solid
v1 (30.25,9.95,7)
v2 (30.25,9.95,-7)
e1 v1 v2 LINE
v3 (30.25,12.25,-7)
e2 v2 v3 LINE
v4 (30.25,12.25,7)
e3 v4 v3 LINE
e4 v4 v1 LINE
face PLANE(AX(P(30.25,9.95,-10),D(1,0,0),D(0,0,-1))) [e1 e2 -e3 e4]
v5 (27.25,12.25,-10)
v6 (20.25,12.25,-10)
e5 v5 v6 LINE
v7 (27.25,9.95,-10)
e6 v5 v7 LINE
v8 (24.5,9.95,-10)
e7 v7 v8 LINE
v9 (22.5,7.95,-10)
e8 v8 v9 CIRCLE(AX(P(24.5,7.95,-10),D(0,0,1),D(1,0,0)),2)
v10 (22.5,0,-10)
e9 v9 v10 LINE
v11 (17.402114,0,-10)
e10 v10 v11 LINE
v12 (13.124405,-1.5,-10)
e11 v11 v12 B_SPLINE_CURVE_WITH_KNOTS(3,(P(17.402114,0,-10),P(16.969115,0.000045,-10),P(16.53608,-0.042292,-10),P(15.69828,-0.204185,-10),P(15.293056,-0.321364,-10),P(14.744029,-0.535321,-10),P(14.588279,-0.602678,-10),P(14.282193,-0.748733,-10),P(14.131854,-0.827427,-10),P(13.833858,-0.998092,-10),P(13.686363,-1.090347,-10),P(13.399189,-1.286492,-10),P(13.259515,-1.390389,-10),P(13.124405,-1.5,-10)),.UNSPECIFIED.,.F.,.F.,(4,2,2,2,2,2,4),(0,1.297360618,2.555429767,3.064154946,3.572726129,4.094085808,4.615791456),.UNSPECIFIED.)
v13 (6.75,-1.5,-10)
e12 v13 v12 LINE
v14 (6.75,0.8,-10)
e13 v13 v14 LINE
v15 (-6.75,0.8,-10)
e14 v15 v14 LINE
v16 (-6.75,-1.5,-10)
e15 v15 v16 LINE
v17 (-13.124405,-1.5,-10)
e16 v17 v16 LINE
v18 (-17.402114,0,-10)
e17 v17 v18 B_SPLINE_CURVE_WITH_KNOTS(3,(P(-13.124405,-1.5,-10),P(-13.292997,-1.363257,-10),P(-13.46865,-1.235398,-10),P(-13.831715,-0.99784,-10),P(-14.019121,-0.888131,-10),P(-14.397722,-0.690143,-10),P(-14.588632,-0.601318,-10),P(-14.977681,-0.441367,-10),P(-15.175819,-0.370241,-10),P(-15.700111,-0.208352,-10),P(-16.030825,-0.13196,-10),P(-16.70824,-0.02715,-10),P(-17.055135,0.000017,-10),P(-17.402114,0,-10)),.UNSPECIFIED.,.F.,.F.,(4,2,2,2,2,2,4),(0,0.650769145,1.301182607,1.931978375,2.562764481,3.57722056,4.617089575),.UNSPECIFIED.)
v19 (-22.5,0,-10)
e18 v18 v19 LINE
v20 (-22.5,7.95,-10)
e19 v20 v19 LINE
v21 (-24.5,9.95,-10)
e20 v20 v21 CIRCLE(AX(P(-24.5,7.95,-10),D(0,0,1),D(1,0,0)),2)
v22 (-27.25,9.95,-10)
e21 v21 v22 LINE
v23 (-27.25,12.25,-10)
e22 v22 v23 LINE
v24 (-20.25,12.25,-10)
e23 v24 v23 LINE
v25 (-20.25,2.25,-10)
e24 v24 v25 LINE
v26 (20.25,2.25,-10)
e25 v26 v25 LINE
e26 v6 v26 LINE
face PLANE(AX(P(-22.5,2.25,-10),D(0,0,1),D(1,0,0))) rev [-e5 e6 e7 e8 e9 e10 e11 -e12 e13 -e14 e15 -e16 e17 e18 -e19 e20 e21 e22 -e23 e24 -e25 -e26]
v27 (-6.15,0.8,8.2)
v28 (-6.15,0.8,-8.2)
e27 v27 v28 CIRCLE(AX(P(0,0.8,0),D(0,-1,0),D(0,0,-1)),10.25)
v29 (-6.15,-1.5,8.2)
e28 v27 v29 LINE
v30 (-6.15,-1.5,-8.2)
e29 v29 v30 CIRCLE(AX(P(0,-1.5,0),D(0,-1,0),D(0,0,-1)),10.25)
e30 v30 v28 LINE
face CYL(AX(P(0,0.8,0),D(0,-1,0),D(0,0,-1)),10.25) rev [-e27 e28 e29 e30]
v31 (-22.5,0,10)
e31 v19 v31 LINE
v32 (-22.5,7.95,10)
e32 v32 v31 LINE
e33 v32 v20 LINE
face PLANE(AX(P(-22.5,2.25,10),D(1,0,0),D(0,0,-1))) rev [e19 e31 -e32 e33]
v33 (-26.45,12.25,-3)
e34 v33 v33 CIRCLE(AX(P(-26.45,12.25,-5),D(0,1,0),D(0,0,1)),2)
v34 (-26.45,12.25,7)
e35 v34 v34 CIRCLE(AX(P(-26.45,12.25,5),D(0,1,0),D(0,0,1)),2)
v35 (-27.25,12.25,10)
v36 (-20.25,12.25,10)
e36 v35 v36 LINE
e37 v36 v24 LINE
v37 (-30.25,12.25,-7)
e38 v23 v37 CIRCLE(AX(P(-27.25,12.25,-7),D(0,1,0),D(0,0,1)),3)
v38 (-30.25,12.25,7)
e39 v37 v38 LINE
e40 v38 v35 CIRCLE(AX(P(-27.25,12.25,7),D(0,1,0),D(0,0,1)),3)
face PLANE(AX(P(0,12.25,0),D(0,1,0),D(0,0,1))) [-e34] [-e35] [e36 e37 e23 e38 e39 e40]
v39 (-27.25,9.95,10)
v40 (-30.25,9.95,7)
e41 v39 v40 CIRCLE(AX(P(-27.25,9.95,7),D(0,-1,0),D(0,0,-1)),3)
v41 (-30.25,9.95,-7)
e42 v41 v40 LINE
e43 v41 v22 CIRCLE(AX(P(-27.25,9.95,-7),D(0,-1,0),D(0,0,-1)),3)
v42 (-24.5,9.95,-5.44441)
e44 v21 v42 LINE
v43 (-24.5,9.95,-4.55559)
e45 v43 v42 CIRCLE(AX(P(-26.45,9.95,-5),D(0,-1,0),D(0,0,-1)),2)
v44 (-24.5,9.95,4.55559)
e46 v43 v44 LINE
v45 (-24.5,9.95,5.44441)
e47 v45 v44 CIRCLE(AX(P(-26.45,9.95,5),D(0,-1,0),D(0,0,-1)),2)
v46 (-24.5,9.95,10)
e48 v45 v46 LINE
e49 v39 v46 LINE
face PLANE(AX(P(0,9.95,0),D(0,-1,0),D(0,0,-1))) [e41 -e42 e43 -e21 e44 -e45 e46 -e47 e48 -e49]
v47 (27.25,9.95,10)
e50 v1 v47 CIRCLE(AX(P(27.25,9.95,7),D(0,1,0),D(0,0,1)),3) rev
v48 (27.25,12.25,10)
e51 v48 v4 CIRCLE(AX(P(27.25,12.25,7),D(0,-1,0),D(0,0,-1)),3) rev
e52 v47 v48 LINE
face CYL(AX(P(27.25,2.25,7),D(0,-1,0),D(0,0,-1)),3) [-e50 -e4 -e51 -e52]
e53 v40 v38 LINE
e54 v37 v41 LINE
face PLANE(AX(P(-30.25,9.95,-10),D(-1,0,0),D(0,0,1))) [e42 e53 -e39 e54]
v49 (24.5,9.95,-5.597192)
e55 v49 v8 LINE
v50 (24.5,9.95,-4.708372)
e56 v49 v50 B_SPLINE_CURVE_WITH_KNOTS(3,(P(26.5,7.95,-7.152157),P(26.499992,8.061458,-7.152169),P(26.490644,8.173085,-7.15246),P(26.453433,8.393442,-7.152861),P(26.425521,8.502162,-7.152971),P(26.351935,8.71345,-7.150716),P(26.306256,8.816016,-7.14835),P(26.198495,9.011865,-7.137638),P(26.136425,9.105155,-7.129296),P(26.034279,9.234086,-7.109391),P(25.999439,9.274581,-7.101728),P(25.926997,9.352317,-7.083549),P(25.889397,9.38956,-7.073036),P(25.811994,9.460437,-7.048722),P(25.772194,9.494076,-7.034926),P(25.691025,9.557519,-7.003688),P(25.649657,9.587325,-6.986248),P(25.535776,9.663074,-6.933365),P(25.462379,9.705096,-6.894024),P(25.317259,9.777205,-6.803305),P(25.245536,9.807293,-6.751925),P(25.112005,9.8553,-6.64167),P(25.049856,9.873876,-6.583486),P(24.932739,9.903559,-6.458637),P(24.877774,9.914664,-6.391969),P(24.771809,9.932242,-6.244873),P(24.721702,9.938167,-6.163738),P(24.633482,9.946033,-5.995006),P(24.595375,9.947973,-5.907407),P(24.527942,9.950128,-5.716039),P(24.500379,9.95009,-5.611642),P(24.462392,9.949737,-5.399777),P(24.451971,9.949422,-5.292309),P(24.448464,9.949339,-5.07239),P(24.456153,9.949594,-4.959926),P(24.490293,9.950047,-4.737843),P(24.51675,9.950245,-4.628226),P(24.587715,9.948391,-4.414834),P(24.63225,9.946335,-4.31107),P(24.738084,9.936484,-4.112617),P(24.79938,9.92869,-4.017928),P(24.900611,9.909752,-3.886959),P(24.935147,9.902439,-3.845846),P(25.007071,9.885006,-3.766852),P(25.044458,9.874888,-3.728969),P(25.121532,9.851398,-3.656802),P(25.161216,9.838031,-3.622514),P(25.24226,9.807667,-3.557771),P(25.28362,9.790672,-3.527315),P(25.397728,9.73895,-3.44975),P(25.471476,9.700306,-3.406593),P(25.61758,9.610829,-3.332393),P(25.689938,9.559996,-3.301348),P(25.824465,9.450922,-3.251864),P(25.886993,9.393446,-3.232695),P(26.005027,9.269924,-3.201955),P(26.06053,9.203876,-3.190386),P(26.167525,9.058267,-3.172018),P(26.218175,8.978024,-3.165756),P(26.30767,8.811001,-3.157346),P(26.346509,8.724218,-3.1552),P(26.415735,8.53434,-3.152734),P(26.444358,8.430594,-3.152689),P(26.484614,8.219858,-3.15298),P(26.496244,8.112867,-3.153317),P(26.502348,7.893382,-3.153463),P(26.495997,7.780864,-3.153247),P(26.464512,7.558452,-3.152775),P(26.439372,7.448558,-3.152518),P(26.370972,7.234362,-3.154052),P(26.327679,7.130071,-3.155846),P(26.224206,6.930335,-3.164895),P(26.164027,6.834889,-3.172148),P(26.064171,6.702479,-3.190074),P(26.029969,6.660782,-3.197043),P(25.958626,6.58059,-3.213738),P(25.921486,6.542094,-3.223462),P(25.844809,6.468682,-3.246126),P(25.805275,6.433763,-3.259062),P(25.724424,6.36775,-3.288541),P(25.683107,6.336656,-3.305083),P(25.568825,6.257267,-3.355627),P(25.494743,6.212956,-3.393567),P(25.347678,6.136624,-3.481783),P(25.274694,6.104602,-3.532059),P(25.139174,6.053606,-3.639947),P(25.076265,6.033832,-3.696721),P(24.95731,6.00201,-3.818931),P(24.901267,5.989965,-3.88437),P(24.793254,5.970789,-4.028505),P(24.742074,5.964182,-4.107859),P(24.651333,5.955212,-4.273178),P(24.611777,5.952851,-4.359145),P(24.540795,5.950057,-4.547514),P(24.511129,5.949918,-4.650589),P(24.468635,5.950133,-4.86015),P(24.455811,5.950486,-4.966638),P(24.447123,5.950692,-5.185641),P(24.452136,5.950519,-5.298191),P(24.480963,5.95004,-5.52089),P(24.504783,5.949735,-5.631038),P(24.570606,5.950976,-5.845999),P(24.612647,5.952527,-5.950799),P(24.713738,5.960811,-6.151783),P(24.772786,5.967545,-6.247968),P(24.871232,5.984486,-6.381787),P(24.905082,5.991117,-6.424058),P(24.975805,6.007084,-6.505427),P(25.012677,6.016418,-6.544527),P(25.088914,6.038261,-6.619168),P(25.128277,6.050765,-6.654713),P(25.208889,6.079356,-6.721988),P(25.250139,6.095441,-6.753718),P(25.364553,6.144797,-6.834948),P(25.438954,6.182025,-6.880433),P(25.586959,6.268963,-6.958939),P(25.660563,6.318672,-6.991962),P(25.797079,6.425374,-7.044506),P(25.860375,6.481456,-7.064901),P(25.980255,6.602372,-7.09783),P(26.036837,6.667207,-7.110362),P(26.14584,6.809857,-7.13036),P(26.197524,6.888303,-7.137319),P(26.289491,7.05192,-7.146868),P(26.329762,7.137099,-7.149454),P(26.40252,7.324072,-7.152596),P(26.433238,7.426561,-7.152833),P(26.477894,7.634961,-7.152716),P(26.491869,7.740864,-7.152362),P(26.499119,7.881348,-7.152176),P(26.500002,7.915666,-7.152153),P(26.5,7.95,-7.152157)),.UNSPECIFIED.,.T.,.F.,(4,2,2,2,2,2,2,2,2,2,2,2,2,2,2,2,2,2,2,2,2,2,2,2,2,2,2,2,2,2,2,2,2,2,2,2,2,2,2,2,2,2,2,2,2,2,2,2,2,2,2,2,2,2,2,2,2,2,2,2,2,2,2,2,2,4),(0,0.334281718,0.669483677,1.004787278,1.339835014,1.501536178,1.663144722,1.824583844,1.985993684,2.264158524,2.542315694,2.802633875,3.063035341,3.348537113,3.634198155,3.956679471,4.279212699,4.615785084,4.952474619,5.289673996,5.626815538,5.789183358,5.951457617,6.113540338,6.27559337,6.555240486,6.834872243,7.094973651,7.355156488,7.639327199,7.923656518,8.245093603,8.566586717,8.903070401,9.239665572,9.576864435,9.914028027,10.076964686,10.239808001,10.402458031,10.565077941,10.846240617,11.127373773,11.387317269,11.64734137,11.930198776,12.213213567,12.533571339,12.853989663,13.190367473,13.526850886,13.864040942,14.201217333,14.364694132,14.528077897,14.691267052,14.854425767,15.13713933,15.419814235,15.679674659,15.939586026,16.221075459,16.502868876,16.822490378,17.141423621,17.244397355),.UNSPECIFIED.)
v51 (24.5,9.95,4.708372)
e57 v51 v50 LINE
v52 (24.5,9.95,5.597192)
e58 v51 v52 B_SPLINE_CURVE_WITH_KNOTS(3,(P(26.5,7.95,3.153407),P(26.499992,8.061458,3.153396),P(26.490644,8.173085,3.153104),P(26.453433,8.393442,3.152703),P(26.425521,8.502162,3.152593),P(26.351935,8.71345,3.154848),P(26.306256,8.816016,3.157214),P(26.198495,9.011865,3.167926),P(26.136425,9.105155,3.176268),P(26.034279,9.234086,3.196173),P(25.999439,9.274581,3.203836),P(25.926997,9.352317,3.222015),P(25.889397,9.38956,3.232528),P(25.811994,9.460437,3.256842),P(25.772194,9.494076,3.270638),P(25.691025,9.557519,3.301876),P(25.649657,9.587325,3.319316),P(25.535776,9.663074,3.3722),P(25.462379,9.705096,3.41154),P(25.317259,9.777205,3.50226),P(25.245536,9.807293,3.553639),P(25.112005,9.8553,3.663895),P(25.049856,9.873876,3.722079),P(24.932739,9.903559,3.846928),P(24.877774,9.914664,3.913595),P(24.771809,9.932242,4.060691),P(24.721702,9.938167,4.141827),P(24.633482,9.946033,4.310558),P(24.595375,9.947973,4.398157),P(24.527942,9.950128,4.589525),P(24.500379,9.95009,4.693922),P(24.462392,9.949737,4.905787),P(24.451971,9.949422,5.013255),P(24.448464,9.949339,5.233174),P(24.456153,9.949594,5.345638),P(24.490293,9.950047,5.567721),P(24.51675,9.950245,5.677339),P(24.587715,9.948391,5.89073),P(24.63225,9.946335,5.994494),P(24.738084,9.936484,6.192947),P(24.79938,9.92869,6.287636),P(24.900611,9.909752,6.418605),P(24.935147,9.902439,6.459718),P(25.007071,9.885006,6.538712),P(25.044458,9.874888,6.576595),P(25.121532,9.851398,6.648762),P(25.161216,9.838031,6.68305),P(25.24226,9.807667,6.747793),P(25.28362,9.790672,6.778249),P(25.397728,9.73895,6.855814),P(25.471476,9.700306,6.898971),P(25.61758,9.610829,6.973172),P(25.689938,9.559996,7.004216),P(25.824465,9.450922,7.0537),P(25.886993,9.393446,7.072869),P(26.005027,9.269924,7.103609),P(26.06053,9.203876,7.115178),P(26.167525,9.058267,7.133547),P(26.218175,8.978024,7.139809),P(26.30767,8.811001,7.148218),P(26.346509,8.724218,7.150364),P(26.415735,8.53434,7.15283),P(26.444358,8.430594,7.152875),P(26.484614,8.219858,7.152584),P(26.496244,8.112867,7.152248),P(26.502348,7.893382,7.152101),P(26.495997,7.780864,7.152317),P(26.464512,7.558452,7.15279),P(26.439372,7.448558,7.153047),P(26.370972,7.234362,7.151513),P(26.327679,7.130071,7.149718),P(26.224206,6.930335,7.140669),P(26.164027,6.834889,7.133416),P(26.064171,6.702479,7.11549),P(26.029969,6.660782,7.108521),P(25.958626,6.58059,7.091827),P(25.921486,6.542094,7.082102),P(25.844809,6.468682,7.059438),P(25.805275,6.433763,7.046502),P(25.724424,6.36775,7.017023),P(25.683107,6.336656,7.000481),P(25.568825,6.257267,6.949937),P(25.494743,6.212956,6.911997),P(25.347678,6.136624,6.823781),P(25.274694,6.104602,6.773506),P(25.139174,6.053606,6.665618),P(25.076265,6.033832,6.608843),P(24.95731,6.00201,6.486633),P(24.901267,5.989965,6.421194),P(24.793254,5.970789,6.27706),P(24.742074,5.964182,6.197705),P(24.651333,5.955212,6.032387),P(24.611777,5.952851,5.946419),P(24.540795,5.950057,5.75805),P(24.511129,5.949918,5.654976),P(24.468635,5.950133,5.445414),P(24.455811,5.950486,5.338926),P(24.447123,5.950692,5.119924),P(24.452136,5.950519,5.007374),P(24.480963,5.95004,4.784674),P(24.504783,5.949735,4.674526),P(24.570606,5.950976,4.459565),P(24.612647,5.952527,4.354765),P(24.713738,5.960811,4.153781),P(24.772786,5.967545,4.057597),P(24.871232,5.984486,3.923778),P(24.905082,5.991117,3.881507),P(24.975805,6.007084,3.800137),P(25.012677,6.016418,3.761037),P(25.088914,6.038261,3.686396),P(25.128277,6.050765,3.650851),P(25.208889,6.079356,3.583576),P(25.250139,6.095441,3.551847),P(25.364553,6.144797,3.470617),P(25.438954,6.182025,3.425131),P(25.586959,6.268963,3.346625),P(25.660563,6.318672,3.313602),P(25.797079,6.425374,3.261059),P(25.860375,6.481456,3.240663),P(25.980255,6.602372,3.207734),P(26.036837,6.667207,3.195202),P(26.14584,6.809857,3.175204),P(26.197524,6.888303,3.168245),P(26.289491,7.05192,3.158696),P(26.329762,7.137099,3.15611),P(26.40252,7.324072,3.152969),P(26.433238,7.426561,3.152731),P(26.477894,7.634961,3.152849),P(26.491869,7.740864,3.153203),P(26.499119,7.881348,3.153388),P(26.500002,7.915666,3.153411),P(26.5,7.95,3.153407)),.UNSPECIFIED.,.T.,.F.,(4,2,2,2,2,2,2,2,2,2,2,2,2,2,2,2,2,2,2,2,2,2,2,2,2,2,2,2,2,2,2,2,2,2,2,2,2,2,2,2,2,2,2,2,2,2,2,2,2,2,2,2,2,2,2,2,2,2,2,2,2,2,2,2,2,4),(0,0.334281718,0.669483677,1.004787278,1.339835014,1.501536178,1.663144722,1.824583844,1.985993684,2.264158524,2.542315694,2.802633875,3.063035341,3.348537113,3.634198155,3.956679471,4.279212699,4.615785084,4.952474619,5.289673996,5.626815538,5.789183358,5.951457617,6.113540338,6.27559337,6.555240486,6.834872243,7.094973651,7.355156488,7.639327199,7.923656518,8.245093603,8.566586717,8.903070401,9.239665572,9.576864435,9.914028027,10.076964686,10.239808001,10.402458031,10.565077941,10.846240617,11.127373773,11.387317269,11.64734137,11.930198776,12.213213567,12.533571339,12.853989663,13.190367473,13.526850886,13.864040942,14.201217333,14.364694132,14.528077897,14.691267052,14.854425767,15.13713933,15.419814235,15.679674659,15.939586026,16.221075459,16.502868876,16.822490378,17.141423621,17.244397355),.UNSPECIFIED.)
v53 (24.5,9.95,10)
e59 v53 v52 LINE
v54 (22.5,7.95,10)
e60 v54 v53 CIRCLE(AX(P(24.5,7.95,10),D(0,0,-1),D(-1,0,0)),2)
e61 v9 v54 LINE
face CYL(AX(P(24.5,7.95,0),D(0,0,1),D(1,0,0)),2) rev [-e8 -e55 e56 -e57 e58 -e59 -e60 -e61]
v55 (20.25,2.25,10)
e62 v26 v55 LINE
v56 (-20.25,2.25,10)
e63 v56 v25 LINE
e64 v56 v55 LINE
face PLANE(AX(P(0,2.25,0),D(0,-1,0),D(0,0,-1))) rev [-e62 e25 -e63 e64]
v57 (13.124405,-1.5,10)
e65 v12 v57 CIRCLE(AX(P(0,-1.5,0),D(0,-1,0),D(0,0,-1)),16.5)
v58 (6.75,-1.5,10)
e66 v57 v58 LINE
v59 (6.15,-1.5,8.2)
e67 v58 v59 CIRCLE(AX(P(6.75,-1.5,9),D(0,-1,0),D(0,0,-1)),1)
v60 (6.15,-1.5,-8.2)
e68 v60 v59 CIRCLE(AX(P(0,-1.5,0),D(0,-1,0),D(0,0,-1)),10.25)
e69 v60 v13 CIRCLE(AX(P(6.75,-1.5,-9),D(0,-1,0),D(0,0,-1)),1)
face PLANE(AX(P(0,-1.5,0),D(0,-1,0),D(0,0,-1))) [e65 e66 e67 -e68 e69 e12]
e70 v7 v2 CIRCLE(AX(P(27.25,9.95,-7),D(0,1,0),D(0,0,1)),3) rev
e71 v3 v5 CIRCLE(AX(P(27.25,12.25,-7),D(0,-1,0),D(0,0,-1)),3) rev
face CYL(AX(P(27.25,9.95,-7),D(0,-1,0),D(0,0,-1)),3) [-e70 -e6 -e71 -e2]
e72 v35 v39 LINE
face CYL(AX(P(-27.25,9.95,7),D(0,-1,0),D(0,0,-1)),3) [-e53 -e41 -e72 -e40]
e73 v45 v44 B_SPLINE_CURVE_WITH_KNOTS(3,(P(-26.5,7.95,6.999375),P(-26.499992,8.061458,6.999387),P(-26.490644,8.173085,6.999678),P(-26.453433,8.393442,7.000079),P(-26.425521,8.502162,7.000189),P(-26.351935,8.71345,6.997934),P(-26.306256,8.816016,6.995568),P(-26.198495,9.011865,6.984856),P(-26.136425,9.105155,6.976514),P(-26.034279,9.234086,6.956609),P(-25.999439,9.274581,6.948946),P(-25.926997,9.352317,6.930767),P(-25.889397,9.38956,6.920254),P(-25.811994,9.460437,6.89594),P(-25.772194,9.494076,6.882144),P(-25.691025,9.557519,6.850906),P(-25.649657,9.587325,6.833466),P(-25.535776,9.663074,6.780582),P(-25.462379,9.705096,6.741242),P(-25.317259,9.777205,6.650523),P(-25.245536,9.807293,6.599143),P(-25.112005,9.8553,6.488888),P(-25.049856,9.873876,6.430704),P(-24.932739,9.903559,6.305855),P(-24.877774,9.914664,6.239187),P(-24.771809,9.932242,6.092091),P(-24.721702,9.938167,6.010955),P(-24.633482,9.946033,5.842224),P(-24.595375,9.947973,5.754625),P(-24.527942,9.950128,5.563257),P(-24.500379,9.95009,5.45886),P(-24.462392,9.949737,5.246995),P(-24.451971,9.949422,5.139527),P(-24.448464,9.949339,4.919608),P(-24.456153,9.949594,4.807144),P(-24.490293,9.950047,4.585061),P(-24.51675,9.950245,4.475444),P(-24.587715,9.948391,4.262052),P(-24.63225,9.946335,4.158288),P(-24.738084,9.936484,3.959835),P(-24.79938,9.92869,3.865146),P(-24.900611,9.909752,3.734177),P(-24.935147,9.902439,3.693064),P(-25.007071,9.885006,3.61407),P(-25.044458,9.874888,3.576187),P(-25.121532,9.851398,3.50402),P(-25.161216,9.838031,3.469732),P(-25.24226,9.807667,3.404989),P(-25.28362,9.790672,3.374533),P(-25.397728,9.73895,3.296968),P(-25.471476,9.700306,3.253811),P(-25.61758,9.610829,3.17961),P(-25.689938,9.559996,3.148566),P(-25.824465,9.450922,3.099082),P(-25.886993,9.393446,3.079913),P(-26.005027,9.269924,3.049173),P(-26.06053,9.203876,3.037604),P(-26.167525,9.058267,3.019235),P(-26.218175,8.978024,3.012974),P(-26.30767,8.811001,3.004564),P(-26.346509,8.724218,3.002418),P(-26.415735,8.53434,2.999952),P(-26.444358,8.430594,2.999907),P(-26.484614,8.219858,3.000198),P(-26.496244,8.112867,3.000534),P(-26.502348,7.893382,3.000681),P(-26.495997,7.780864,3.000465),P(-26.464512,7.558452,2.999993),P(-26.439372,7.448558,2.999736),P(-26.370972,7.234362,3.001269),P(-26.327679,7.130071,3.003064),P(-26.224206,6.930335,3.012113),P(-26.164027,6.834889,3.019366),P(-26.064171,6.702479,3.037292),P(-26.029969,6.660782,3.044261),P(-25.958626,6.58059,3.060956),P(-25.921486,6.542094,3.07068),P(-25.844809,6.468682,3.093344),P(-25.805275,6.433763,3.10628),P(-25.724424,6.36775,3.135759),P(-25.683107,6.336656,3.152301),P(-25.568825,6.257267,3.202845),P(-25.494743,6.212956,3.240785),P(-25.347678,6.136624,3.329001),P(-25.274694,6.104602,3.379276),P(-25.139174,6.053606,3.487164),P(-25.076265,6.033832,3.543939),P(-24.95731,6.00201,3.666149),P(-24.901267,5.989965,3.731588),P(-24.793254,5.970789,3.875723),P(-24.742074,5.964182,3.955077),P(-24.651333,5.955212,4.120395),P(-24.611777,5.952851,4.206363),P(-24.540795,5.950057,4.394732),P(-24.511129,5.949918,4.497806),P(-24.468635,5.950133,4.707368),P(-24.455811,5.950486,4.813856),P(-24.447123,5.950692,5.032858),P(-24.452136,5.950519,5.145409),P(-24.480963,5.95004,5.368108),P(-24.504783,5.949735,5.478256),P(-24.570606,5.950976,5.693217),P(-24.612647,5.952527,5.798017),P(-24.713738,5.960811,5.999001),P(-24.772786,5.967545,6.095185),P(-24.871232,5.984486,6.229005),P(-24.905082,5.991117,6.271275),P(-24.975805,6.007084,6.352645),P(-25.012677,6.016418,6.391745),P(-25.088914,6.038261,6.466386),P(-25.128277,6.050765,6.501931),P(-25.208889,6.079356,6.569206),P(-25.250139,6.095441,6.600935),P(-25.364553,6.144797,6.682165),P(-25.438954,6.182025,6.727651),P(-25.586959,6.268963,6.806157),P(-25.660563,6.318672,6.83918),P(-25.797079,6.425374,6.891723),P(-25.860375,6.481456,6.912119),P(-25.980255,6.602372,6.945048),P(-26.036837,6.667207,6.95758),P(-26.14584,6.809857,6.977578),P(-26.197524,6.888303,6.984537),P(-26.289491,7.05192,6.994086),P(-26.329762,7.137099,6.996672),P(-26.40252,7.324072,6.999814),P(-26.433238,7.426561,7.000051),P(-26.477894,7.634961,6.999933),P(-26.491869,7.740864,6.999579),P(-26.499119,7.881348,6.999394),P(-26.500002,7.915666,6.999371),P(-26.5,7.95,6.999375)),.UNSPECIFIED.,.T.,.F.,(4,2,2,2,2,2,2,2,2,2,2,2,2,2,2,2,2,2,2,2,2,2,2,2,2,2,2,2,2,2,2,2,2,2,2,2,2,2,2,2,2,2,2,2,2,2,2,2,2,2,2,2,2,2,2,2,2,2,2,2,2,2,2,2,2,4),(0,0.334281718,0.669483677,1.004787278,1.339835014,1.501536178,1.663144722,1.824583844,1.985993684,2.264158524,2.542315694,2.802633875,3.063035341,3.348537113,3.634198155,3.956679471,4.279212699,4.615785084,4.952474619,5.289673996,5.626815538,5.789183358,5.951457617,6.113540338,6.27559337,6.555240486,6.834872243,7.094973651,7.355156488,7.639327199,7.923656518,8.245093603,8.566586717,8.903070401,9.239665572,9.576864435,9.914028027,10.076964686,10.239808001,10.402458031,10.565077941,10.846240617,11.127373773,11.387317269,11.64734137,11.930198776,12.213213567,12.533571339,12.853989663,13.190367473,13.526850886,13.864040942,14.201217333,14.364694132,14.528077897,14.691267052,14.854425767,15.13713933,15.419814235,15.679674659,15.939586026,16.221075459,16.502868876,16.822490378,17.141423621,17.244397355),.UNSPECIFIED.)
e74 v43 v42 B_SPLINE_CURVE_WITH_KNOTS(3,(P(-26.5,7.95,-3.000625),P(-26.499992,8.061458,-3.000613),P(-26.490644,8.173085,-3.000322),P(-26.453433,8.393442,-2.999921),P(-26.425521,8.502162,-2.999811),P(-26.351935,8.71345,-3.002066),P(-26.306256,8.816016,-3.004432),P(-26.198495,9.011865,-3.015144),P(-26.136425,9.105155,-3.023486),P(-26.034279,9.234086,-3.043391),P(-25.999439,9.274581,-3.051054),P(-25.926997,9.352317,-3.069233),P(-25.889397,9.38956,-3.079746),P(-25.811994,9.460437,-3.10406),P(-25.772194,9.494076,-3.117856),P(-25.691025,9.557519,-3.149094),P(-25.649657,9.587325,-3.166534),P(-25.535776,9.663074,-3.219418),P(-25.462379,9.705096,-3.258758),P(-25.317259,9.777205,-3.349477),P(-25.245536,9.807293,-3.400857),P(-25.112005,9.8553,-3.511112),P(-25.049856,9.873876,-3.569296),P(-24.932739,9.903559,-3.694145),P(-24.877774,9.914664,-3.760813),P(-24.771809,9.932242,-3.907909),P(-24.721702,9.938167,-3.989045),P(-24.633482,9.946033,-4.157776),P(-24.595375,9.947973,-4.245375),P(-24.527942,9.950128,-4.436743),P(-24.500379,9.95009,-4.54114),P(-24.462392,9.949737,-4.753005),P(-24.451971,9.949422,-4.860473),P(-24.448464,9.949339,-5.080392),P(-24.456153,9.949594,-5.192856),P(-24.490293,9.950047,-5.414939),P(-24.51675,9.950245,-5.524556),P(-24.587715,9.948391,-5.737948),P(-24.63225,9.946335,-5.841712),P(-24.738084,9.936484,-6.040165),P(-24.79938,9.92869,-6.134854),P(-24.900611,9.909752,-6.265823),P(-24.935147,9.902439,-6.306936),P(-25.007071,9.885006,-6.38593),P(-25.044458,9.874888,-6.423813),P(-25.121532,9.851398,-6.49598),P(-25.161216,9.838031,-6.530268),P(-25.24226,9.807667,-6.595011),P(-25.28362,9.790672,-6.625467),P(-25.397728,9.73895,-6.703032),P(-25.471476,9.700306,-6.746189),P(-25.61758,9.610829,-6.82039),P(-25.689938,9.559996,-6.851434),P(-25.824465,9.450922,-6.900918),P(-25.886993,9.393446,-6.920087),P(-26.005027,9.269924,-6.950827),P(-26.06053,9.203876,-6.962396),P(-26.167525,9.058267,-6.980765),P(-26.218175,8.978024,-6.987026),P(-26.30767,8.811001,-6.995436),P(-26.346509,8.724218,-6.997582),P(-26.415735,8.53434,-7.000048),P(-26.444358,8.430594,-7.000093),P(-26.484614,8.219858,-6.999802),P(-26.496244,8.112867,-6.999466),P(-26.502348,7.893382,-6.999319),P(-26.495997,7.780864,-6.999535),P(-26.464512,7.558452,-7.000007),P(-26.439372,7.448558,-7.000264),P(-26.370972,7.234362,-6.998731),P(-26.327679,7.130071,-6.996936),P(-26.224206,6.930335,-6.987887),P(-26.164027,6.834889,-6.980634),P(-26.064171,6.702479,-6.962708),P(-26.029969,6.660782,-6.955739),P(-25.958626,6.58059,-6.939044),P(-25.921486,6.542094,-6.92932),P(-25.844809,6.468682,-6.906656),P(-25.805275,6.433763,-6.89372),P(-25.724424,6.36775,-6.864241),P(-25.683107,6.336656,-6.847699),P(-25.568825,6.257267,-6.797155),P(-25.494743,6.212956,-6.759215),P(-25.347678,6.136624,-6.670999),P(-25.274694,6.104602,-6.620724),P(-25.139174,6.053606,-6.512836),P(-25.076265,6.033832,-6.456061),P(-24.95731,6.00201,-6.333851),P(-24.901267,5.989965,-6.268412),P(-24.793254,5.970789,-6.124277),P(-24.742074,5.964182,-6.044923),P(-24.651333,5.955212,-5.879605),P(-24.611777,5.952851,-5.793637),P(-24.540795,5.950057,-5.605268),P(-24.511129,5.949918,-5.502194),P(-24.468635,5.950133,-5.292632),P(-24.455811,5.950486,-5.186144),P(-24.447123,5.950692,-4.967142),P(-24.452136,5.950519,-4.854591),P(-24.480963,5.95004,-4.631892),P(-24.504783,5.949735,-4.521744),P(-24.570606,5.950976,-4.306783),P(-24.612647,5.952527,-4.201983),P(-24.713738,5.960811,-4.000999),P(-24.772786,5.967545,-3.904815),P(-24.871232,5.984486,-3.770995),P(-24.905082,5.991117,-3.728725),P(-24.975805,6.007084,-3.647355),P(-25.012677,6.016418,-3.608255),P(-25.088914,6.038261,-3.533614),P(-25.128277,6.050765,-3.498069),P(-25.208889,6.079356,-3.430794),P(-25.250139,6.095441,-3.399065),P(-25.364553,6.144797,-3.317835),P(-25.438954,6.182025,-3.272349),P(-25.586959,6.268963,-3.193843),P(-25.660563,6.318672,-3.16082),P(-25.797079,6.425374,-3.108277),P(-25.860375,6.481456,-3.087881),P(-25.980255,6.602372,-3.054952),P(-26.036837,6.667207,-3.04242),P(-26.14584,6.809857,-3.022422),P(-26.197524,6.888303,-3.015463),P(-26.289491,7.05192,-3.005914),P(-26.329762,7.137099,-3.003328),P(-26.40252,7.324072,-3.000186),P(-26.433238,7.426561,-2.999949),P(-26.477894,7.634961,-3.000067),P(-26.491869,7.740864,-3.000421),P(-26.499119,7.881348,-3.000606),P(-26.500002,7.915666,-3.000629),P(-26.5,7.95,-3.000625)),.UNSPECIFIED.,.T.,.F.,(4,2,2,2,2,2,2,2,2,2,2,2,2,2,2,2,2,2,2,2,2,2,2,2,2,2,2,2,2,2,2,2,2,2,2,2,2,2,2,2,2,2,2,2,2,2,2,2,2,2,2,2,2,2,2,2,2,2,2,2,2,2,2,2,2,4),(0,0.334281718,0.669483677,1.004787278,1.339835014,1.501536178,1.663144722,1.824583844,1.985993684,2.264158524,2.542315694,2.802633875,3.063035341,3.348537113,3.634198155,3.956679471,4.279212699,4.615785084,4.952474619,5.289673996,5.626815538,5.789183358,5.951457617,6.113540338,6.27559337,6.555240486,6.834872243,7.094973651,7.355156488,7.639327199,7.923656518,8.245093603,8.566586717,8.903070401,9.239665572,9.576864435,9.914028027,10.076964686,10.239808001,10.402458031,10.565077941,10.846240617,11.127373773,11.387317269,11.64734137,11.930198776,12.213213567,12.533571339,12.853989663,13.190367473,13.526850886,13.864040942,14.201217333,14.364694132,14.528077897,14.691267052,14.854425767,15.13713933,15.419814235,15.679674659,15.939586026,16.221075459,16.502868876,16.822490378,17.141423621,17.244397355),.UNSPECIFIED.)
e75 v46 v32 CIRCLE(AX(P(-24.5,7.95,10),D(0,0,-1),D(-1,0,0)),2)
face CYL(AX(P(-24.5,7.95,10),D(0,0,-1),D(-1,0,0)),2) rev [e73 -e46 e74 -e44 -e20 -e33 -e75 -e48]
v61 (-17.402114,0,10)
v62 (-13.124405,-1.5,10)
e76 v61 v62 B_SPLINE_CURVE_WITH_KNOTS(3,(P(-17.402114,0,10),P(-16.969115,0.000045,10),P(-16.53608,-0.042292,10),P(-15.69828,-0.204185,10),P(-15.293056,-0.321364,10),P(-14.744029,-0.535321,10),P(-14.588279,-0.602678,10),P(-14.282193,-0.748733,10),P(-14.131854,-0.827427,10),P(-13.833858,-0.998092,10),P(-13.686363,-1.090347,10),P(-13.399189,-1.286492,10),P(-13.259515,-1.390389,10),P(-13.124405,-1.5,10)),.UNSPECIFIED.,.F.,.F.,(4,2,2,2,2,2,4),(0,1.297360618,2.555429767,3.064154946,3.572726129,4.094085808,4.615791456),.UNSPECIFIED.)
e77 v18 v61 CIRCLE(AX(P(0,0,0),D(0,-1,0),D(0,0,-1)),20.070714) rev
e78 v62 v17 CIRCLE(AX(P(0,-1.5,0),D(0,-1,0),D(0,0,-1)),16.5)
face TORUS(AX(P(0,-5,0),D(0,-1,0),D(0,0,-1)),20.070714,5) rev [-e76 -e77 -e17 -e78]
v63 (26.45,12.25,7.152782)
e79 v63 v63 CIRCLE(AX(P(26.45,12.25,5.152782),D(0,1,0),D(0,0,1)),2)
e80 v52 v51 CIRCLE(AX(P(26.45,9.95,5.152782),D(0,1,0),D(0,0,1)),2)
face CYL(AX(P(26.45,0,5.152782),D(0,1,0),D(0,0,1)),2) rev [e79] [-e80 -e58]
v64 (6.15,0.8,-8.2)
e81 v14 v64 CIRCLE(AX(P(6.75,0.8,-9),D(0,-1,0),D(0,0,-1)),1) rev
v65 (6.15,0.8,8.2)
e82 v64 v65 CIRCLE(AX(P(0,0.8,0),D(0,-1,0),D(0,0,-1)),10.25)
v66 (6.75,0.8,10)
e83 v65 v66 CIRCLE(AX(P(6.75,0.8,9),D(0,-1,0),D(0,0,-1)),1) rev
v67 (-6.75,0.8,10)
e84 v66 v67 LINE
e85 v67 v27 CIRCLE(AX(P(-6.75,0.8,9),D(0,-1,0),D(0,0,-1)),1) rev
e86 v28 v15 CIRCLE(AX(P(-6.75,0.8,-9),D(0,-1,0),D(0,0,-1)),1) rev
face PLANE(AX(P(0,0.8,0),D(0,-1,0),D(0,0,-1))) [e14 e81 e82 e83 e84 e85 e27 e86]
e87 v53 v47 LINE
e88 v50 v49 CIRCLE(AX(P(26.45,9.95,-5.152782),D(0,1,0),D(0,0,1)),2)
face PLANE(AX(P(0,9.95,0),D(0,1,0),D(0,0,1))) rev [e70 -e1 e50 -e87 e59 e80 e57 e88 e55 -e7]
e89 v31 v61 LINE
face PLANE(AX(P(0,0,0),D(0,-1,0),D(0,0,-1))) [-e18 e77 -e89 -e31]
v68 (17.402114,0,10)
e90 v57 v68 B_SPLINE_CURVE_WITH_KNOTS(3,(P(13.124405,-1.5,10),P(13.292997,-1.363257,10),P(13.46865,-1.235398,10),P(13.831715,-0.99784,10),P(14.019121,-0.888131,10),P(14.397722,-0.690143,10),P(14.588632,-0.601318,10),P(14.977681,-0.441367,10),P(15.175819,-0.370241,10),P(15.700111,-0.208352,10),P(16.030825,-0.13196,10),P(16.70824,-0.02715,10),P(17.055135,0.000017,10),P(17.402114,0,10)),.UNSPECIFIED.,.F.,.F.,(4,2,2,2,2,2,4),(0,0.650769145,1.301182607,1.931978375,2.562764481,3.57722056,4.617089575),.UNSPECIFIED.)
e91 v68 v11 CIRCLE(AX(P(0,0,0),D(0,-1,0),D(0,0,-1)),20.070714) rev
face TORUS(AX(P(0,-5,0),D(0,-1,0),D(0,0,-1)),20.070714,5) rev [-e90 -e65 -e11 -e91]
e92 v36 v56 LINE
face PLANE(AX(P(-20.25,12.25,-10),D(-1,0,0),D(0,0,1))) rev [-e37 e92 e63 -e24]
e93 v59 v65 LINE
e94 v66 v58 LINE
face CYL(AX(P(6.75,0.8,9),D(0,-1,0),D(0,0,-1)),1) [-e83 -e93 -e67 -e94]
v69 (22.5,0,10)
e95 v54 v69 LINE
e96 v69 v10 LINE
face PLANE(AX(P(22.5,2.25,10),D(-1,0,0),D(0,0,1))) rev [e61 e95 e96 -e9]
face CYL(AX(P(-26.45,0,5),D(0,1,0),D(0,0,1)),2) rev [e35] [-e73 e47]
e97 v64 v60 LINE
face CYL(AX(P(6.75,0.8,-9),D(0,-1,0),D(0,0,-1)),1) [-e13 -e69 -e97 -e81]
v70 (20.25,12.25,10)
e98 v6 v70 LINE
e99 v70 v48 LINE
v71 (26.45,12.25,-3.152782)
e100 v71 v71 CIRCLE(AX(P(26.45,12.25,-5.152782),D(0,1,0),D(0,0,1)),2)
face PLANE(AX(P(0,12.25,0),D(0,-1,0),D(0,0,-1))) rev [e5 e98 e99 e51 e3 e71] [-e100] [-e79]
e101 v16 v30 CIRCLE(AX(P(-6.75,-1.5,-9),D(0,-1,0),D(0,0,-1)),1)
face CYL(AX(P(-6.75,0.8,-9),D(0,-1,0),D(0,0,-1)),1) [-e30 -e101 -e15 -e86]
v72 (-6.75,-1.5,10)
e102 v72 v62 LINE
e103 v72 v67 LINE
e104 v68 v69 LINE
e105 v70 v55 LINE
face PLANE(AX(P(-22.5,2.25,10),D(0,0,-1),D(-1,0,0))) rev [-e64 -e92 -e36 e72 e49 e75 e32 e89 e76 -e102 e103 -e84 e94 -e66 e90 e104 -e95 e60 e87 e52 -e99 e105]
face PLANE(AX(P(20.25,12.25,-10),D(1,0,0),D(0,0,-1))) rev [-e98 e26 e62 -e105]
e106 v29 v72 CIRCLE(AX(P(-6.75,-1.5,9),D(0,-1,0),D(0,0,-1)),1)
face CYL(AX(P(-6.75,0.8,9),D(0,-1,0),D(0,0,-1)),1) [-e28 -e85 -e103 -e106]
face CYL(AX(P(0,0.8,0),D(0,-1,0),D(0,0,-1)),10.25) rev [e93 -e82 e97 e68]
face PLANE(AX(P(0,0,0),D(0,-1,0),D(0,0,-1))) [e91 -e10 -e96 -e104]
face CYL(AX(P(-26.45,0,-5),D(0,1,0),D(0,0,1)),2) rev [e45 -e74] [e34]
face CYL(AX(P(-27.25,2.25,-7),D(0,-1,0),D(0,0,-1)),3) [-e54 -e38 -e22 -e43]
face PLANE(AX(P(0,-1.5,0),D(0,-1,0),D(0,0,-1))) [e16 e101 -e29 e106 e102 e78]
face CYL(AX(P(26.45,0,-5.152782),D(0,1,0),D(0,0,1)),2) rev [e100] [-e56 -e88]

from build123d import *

# Parameters (mm, degrees)
SKETCH1_W           = 45
SKETCH1_H           = 20
BOSS_EXTRUDE1_DEPTH = 2.25
SKETCH2_W           = 2.25
SKETCH2_H           = 20
BOSS_EXTRUDE2_DEPTH = 10
SKETCH3_W           = 10
SKETCH3_H           = 20
BOSS_EXTRUDE3_DEPTH = 2.3
FILLET1_R           = 2
SKETCH4_R           = 2
CUT_EXTRUDE1_DEPTH  = 35.133927404
BOSS_EXTRUDE5_DEPTH = 1.5
SKETCH6_R           = 10.25
CUT_EXTRUDE2_DEPTH  = 2.3
FILLET2_R           = 5
FILLET3_R           = 1
FILLET4_R           = 3


with BuildPart() as part:
    # Sketch1 → Boss-Extrude1 (new body)
    with BuildSketch(Plane(origin=(0, 0, 0), x_dir=(1, 0, 0), z_dir=(0, 1, 0))):
        Rectangle(SKETCH1_W, SKETCH1_H)
    extrude(amount=BOSS_EXTRUDE1_DEPTH)

    # Sketch2 → Boss-Extrude2 (add)
    with BuildSketch(Plane(origin=(0, 2.25, 0), x_dir=(1, 0, 0), z_dir=(0, 1, 0))):
        with Locations((-21.375, 0)):
            Rectangle(SKETCH2_W, SKETCH2_H)
        with Locations((21.375, 0)):
            Rectangle(SKETCH2_W, SKETCH2_H)
    extrude(amount=BOSS_EXTRUDE2_DEPTH)

    # Sketch3 → Boss-Extrude3 (add)
    with BuildSketch(Plane(origin=(0, 12.25, 0), x_dir=(1, 0, 0), z_dir=(0, 1, 0))):
        with Locations((-25.25, 0)):
            Rectangle(SKETCH3_W, SKETCH3_H)
        with Locations((25.25, 0)):
            Rectangle(SKETCH3_W, SKETCH3_H)
    extrude(amount=-BOSS_EXTRUDE3_DEPTH)

    # Fillet1
    fillet1_edges = [part.edges().sort_by_distance(p)[0] for p in [
        (-22.5, 9.95, 0),
        (22.5, 9.95, 0),
    ]]
    fillet(fillet1_edges, radius=FILLET1_R)

    # Sketch4 → Cut-Extrude1 (cut, through all)
    with BuildSketch(Plane(origin=(0, 12.25, 0), x_dir=(1, 0, 0), z_dir=(0, 1, 0))):
        with Locations(Location((26.45, 5.15278214, 0), (0, 0, 270))):
            Circle(SKETCH4_R)
        with Locations(Location((26.45, -5.15278214, 0), (0, 0, 270))):
            Circle(SKETCH4_R)
        with Locations(Location((-26.45, 5, 0), (0, 0, 270))):
            Circle(SKETCH4_R)
        with Locations(Location((-26.45, -5, 0), (0, 0, 270))):
            Circle(SKETCH4_R)
    extrude(amount=-CUT_EXTRUDE1_DEPTH, mode=Mode.SUBTRACT)

    # Sketch5 → Boss-Extrude5 (add)
    with BuildSketch(Plane.XZ):
        with BuildLine():
            Line((13.124404748, 10), (-13.124404748, 10))
            ThreePointArc((-13.124404748, 10), (-16.5, 0), (-13.124404748, -10))
            Line((-13.124404748, -10), (13.124404748, -10))
            ThreePointArc((13.124404748, -10), (16.5, 0), (13.124404748, 10))
        make_face()
    extrude(amount=BOSS_EXTRUDE5_DEPTH)

    # Sketch6 → Cut-Extrude2 (cut)
    with BuildSketch(Plane.XZ.offset(1.5)):
        Circle(SKETCH6_R)
    extrude(amount=-CUT_EXTRUDE2_DEPTH, mode=Mode.SUBTRACT)

    # Fillet2
    # the kernel refuses this fillet: 5 mm, written as the material it adds along each edge
    with BuildSketch(Plane(origin=(0, 0, 0), x_dir=(0.3695559443518841, 0, -0.9292084825238021), z_dir=(-0.9292084825238021, 0, -0.3695559443518841))) as fillet2_piece_1_section:
        with BuildLine():
            CenterArc((20.070714214, 5), FILLET2_R, 224.427004001, 45.572995999)
            Line((16.5, 1.5), (16.428585716, 1.43))
            ThreePointArc((16.428585716, 1.43), (16.4, 0.75), (16.4, 0))
            Line((16.4, 0), (16.5, -0.1))
            Line((16.5, -0.1), (20.070714214, -0.1))
            Line((20.070714214, -0.1), (20.070714214, 0))
        make_face()
    fillet2_piece_1 = revolve(axis=Axis((0, 0, 0), (0, -1, 0)), revolution_arc=136.623532333, mode=Mode.PRIVATE)
    fillet2_piece_1 = split(fillet2_piece_1, bisect_by=Plane(origin=(18.120334402, -0.357167387, 10), z_dir=(0, 0, -1)), keep=Keep.TOP, mode=Mode.PRIVATE)
    fillet2_piece_1 = split(fillet2_piece_1, bisect_by=Plane(origin=(18.120334402, -0.357167387, -10), z_dir=(0, 0, 1)), keep=Keep.TOP, mode=Mode.PRIVATE)
    add(fillet2_piece_1)
    with BuildSketch(Plane(origin=(0, 0, 0), x_dir=(-0.3695559443518876, 0, 0.9292084825238008), z_dir=(0.9292084825238008, 0, 0.3695559443518876))) as fillet2_piece_2_section:
        with BuildLine():
            CenterArc((20.070714214, 5), FILLET2_R, 224.427004001, 45.572995999)
            Line((20.070714214, 0), (20.070714214, -0.1))
            Line((20.070714214, -0.1), (16.5, -0.1))
            Line((16.5, -0.1), (16.4, 0))
            ThreePointArc((16.4, 0), (16.4, 0.75), (16.428585716, 1.43))
            Line((16.428585716, 1.43), (16.5, 1.5))
        make_face()
    fillet2_piece_2 = revolve(axis=Axis((0, 0, 0), (0, -1, 0)), revolution_arc=136.623532333, mode=Mode.PRIVATE)
    fillet2_piece_2 = split(fillet2_piece_2, bisect_by=Plane(origin=(-18.120334402, -0.357167387, 10), z_dir=(0, 0, -1)), keep=Keep.TOP, mode=Mode.PRIVATE)
    fillet2_piece_2 = split(fillet2_piece_2, bisect_by=Plane(origin=(-18.120334402, -0.357167387, -10), z_dir=(0, 0, 1)), keep=Keep.TOP, mode=Mode.PRIVATE)
    add(fillet2_piece_2)

    # Fillet3
    fillet3_edges = [part.edges().sort_by_distance(p)[0] for p in [
        (-2.25, -0.35, -10),
        (-2.25, -0.35, 10),
        (2.25, -0.35, -10),
        (2.25, -0.35, 10),
    ]]
    fillet(fillet3_edges, radius=FILLET3_R)

    # Fillet4
    fillet4_edges = [part.edges().sort_by_distance(p)[0] for p in [
        (-30.25, 11.1, -10),
        (-30.25, 11.1, 10),
        (30.25, 11.1, 10),
        (30.25, 11.1, -10),
    ]]
    fillet(fillet4_edges, radius=FILLET4_R)


solid = part.part
